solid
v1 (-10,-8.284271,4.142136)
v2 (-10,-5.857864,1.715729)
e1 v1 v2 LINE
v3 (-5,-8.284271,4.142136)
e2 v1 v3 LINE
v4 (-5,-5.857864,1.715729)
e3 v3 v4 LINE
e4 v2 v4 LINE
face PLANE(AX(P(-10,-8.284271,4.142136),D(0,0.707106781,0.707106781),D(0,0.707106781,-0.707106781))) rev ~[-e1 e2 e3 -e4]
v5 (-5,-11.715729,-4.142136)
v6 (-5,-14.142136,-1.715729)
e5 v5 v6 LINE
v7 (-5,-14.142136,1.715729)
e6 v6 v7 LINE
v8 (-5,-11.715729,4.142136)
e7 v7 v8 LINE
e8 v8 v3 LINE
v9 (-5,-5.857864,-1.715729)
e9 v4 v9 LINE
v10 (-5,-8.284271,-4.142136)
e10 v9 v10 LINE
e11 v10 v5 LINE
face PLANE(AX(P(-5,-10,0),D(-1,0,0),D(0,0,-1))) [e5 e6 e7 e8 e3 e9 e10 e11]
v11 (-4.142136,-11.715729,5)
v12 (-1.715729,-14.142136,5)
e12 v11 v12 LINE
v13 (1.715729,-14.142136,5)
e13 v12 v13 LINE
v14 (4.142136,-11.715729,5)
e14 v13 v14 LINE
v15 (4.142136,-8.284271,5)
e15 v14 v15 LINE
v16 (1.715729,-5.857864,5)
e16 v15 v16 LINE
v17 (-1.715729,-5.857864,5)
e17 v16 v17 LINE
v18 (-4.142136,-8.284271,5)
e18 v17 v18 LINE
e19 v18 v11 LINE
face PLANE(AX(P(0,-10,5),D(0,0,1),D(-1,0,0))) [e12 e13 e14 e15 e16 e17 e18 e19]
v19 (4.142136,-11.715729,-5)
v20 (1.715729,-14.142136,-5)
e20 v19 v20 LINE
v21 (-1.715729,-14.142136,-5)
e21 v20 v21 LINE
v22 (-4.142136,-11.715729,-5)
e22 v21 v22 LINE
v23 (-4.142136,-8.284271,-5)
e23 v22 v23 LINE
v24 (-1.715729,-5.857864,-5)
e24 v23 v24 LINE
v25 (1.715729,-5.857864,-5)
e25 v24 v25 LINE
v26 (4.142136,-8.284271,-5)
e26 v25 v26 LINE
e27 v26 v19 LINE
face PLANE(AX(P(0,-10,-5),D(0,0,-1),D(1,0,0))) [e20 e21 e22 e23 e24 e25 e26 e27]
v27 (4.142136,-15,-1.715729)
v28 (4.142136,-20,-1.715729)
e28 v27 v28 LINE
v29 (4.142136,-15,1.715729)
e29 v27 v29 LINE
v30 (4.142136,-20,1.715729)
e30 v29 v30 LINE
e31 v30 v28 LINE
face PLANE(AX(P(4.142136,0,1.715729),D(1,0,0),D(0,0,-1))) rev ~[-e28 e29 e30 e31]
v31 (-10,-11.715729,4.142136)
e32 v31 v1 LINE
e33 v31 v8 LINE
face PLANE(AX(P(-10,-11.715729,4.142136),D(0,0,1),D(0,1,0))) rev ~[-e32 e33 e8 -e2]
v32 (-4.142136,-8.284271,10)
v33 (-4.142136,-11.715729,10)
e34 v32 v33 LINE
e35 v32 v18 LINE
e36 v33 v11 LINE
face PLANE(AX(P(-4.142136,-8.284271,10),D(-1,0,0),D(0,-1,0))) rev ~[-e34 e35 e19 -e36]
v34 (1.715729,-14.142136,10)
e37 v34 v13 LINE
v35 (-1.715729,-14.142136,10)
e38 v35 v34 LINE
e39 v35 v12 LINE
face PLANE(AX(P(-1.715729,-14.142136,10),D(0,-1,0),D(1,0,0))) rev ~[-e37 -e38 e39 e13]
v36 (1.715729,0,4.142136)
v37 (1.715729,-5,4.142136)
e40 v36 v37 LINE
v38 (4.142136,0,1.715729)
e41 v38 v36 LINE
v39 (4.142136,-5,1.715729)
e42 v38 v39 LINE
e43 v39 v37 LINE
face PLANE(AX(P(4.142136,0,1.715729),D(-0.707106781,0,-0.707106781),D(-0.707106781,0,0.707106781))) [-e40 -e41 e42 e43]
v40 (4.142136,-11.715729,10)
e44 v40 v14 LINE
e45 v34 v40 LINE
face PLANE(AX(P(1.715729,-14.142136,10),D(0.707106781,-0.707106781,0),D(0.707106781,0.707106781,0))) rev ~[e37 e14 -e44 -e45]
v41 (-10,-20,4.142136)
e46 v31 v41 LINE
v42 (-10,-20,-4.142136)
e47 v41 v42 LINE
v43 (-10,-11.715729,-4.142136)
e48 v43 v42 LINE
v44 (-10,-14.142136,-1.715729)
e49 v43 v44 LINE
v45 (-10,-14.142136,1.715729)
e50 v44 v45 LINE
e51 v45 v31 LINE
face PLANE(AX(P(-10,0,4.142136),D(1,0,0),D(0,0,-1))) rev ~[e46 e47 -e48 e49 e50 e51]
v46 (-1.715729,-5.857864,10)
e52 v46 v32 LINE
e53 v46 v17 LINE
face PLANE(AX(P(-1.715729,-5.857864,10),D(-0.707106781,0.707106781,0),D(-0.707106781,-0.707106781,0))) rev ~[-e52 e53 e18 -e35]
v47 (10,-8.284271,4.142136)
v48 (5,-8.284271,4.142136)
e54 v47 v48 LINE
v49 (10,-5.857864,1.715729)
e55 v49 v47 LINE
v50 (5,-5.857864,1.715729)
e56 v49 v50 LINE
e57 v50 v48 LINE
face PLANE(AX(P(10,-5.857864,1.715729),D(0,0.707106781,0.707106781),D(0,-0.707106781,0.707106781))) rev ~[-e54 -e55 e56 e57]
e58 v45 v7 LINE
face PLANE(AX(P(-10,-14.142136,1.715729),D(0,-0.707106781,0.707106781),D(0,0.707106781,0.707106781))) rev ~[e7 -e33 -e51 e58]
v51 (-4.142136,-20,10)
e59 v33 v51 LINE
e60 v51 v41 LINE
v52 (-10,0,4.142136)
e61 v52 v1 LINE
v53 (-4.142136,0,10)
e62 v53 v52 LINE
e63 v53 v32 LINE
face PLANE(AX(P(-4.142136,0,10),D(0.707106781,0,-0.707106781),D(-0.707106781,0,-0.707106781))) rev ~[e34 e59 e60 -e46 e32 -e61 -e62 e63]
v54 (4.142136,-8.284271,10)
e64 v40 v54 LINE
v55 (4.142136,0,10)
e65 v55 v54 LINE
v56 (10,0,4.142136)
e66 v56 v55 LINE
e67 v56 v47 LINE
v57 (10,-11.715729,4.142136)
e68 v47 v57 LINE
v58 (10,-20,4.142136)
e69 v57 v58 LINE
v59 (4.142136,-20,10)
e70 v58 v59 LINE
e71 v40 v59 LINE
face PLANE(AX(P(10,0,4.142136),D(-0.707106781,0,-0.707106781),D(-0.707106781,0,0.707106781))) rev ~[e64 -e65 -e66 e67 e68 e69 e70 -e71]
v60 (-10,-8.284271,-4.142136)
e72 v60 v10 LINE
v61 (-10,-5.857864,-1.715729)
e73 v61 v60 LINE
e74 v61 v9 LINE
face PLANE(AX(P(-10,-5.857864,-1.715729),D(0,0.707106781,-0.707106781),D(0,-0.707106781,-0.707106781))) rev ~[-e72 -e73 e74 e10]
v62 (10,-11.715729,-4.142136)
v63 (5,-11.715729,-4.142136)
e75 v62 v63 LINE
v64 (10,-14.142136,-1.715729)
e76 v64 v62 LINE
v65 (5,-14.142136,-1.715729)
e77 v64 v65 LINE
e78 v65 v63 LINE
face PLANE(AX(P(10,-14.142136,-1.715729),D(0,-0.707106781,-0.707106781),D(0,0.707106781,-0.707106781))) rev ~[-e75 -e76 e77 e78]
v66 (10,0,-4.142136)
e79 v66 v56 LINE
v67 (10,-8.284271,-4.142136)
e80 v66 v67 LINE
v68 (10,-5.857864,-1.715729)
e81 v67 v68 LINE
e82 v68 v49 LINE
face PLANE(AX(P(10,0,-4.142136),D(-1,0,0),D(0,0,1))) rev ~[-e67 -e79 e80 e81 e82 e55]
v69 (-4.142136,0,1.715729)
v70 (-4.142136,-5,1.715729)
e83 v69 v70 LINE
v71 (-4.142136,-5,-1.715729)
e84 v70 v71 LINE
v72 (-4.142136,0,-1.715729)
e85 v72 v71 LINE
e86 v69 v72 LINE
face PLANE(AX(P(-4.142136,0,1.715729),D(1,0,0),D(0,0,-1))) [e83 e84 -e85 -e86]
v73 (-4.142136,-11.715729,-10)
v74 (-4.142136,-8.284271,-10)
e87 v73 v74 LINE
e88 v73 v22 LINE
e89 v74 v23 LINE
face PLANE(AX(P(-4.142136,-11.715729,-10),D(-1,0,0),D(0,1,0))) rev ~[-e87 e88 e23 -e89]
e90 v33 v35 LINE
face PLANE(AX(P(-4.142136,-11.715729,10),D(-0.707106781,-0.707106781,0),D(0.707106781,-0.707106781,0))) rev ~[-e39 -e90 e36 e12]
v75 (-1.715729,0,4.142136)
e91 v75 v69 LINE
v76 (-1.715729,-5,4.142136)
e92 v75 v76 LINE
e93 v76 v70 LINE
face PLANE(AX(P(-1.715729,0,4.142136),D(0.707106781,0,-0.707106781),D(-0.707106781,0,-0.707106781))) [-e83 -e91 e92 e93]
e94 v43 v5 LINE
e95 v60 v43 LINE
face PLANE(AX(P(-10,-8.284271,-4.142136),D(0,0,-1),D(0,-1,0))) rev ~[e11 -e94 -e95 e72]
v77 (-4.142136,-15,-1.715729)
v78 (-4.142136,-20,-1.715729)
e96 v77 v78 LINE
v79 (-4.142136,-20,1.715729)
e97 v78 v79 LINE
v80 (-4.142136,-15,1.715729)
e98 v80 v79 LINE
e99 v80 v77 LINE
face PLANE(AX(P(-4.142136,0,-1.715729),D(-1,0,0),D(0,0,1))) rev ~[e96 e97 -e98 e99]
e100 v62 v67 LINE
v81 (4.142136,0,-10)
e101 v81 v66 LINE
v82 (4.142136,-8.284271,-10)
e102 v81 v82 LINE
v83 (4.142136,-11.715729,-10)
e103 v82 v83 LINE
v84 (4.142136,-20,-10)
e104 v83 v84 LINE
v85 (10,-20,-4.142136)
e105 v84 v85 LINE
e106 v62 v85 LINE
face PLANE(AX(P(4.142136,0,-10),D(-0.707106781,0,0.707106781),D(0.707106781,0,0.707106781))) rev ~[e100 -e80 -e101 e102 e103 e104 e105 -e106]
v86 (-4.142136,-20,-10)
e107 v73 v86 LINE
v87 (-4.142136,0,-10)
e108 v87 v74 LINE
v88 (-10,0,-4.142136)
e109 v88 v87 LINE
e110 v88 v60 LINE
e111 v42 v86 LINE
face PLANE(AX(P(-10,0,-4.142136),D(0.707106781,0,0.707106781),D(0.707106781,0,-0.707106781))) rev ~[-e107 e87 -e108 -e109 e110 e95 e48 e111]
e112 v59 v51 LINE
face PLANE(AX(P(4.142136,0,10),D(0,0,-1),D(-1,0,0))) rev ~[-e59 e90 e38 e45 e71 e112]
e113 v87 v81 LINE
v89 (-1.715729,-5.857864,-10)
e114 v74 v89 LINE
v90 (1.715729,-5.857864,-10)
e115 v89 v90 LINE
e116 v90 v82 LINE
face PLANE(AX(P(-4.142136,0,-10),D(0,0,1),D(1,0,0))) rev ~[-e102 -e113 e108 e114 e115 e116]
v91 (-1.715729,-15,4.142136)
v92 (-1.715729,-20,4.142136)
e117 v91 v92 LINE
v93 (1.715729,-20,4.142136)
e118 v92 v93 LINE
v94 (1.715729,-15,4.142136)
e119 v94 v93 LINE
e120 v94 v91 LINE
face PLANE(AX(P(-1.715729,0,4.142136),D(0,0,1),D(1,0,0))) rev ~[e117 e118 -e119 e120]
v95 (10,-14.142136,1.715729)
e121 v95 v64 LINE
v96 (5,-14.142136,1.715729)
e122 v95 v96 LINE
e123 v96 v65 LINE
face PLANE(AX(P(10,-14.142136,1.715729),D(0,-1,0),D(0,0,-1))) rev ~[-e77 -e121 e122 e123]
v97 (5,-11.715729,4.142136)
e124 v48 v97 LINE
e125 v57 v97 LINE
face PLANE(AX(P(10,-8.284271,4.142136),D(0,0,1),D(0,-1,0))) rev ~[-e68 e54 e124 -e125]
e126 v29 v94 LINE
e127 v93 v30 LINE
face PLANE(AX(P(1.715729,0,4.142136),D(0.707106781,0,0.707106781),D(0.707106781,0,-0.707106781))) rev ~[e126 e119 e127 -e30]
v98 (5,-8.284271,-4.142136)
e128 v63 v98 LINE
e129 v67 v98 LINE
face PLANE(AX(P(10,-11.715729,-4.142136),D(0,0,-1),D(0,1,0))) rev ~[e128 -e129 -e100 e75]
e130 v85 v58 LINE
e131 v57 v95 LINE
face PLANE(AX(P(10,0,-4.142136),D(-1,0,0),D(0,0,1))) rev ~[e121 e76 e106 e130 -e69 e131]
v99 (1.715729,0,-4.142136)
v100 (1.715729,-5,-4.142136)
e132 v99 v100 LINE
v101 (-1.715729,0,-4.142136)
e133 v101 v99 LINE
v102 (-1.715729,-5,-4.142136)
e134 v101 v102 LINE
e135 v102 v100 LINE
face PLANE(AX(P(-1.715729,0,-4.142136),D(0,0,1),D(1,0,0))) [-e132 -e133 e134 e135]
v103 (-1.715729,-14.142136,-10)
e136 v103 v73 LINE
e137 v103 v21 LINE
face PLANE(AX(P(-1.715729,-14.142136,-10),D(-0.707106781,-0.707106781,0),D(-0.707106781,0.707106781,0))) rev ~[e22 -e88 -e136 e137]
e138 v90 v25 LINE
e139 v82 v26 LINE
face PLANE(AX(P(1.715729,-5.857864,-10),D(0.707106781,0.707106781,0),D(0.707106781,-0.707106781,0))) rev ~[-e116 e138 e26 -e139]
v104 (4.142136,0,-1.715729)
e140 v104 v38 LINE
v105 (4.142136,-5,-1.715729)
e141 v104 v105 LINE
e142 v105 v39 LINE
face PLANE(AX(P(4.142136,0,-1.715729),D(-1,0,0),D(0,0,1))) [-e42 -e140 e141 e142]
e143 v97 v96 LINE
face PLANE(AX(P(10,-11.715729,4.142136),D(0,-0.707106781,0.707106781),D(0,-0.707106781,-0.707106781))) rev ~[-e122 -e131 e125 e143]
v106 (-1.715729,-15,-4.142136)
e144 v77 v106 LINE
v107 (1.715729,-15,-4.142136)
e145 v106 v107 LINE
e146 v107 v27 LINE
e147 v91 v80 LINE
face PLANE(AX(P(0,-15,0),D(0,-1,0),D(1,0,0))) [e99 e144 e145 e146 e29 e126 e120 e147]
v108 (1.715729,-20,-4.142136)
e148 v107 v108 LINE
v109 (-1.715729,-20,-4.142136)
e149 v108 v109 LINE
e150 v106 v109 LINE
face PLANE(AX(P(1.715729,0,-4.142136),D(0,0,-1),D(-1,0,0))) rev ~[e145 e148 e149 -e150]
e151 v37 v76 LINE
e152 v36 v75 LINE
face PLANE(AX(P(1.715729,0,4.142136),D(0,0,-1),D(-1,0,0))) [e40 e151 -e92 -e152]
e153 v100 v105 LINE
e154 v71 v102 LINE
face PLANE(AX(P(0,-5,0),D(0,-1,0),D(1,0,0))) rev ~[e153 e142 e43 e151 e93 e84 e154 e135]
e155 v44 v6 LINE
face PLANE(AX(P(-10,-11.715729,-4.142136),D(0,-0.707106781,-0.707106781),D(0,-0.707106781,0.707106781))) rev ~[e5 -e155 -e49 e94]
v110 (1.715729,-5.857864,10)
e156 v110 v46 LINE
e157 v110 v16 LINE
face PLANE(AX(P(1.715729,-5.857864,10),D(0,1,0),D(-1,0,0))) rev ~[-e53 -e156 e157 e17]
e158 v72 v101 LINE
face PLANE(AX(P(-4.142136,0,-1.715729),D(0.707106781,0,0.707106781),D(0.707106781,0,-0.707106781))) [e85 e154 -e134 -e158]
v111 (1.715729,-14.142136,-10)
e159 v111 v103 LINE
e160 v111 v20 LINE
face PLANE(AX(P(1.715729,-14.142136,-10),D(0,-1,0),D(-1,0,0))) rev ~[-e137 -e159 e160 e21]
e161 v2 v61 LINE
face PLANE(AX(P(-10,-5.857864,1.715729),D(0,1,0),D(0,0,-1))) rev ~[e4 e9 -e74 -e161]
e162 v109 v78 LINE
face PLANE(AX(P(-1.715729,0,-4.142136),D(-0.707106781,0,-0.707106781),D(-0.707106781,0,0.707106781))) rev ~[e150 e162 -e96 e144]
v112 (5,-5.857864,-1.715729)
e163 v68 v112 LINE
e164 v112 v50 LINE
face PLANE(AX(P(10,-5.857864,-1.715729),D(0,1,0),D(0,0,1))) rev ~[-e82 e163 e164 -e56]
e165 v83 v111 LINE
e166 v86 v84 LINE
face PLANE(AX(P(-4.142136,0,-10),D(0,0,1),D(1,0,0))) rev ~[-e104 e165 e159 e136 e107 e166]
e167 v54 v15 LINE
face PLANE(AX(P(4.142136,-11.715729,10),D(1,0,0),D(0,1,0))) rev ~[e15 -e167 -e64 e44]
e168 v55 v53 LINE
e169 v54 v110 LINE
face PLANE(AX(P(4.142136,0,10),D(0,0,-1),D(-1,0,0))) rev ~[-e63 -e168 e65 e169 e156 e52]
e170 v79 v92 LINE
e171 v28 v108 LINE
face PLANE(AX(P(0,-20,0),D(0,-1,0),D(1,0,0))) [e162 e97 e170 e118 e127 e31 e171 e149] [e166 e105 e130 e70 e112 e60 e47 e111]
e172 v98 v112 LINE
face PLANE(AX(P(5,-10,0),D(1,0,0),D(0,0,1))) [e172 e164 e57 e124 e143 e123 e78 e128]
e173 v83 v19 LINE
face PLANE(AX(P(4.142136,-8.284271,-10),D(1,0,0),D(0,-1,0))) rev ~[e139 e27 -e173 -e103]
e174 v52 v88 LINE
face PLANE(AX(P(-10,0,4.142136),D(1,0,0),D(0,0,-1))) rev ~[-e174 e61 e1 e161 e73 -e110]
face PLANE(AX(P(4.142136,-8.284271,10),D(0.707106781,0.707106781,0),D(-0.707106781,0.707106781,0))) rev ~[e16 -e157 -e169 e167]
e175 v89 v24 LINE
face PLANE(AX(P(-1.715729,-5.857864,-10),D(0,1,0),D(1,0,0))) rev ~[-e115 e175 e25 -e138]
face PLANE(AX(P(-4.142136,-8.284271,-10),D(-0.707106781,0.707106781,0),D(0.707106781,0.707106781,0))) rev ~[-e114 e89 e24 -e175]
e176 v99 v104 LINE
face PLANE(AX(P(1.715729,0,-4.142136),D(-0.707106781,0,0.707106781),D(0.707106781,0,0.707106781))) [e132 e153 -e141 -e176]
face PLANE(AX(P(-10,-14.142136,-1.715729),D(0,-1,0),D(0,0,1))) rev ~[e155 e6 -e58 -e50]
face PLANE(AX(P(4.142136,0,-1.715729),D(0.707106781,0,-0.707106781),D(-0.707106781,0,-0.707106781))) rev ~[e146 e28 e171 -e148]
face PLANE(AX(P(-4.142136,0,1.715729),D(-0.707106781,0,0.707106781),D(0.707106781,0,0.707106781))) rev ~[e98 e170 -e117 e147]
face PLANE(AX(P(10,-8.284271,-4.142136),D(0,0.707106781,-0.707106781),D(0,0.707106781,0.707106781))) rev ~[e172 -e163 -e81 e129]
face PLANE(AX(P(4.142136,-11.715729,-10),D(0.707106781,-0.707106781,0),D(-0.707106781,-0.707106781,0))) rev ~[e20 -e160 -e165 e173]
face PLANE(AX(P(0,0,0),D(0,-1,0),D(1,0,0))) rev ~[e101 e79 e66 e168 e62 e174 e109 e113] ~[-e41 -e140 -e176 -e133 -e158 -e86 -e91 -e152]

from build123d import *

# Parameters (mm, degrees)
F1_DEPTH        = 15
F2_DEPTH        = 20
F3_DEPTH        = 5
F5_DEPTH        = 5
F5_COPIES_COUNT = 4


# Not quite as in the source:
# - a pattern or mirror of a feature is missing from the dataset's text; its kind, count and spacing are read off the source's solid


with BuildPart() as f1:
    # F0 (on Front) → F1 (new body)
    with BuildSketch(Plane.XZ):
        Polygon((-4.1421356237, -1.7157287525), (-1.7157287525, -4.1421356237), (1.7157287525, -4.1421356237), (4.1421356237, -1.7157287525), (4.1421356237, 1.7157287525), (1.7157287525, 4.1421356237), (-1.7157287525, 4.1421356237), (-4.1421356237, 1.7157287525), align=None)
    extrude(amount=F1_DEPTH)

    # F0 (on Front) → F2 (join)
    with BuildSketch(Plane.XZ):
        Polygon((4.1421356237, -10), (10, -4.1421356237), (10, 4.1421356237), (4.1421356237, 10), (-4.1421356237, 10), (-10, 4.1421356237), (-10, -4.1421356237), (-4.1421356237, -10), align=None)
        Polygon((1.7157287525, -4.1421356237), (-1.7157287525, -4.1421356237), (-4.1421356237, -1.7157287525), (-4.1421356237, 1.7157287525), (-1.7157287525, 4.1421356237), (1.7157287525, 4.1421356237), (4.1421356237, 1.7157287525), (4.1421356237, -1.7157287525), align=None, mode=Mode.SUBTRACT)
    extrude(amount=F2_DEPTH)

    # F0 (on Front) → F3 (cut)
    with BuildSketch(Plane.XZ):
        Polygon((-4.1421356237, -1.7157287525), (-1.7157287525, -4.1421356237), (1.7157287525, -4.1421356237), (4.1421356237, -1.7157287525), (4.1421356237, 1.7157287525), (1.7157287525, 4.1421356237), (-1.7157287525, 4.1421356237), (-4.1421356237, 1.7157287525), align=None)
    extrude(amount=F3_DEPTH, mode=Mode.SUBTRACT)

    # F4 (on face) → F5 (cut)
    with BuildSketch(Plane(origin=(0, 0, -10), x_dir=(1, 0, 0), z_dir=(0, 0, -1))):
        Polygon((-4.1421356237, 11.7157287525), (-4.1421356237, 8.2842712475), (-1.7157287525, 5.8578643763), (1.7157287525, 5.8578643763), (4.1421356237, 8.2842712475), (4.1421356237, 11.7157287525), (1.7157287525, 14.1421356237), (-1.7157287525, 14.1421356237), align=None)
    f5 = extrude(amount=-F5_DEPTH, mode=Mode.SUBTRACT)

    # F5_copies: F5 ×4 about axis
    f5_copies_axis = Axis((0, 0, 0), (0, 1, 0))
    for i in range(1, F5_COPIES_COUNT):
        add(f5.rotate(f5_copies_axis, i * 360 / F5_COPIES_COUNT), mode=Mode.SUBTRACT)


solid = f1.part
